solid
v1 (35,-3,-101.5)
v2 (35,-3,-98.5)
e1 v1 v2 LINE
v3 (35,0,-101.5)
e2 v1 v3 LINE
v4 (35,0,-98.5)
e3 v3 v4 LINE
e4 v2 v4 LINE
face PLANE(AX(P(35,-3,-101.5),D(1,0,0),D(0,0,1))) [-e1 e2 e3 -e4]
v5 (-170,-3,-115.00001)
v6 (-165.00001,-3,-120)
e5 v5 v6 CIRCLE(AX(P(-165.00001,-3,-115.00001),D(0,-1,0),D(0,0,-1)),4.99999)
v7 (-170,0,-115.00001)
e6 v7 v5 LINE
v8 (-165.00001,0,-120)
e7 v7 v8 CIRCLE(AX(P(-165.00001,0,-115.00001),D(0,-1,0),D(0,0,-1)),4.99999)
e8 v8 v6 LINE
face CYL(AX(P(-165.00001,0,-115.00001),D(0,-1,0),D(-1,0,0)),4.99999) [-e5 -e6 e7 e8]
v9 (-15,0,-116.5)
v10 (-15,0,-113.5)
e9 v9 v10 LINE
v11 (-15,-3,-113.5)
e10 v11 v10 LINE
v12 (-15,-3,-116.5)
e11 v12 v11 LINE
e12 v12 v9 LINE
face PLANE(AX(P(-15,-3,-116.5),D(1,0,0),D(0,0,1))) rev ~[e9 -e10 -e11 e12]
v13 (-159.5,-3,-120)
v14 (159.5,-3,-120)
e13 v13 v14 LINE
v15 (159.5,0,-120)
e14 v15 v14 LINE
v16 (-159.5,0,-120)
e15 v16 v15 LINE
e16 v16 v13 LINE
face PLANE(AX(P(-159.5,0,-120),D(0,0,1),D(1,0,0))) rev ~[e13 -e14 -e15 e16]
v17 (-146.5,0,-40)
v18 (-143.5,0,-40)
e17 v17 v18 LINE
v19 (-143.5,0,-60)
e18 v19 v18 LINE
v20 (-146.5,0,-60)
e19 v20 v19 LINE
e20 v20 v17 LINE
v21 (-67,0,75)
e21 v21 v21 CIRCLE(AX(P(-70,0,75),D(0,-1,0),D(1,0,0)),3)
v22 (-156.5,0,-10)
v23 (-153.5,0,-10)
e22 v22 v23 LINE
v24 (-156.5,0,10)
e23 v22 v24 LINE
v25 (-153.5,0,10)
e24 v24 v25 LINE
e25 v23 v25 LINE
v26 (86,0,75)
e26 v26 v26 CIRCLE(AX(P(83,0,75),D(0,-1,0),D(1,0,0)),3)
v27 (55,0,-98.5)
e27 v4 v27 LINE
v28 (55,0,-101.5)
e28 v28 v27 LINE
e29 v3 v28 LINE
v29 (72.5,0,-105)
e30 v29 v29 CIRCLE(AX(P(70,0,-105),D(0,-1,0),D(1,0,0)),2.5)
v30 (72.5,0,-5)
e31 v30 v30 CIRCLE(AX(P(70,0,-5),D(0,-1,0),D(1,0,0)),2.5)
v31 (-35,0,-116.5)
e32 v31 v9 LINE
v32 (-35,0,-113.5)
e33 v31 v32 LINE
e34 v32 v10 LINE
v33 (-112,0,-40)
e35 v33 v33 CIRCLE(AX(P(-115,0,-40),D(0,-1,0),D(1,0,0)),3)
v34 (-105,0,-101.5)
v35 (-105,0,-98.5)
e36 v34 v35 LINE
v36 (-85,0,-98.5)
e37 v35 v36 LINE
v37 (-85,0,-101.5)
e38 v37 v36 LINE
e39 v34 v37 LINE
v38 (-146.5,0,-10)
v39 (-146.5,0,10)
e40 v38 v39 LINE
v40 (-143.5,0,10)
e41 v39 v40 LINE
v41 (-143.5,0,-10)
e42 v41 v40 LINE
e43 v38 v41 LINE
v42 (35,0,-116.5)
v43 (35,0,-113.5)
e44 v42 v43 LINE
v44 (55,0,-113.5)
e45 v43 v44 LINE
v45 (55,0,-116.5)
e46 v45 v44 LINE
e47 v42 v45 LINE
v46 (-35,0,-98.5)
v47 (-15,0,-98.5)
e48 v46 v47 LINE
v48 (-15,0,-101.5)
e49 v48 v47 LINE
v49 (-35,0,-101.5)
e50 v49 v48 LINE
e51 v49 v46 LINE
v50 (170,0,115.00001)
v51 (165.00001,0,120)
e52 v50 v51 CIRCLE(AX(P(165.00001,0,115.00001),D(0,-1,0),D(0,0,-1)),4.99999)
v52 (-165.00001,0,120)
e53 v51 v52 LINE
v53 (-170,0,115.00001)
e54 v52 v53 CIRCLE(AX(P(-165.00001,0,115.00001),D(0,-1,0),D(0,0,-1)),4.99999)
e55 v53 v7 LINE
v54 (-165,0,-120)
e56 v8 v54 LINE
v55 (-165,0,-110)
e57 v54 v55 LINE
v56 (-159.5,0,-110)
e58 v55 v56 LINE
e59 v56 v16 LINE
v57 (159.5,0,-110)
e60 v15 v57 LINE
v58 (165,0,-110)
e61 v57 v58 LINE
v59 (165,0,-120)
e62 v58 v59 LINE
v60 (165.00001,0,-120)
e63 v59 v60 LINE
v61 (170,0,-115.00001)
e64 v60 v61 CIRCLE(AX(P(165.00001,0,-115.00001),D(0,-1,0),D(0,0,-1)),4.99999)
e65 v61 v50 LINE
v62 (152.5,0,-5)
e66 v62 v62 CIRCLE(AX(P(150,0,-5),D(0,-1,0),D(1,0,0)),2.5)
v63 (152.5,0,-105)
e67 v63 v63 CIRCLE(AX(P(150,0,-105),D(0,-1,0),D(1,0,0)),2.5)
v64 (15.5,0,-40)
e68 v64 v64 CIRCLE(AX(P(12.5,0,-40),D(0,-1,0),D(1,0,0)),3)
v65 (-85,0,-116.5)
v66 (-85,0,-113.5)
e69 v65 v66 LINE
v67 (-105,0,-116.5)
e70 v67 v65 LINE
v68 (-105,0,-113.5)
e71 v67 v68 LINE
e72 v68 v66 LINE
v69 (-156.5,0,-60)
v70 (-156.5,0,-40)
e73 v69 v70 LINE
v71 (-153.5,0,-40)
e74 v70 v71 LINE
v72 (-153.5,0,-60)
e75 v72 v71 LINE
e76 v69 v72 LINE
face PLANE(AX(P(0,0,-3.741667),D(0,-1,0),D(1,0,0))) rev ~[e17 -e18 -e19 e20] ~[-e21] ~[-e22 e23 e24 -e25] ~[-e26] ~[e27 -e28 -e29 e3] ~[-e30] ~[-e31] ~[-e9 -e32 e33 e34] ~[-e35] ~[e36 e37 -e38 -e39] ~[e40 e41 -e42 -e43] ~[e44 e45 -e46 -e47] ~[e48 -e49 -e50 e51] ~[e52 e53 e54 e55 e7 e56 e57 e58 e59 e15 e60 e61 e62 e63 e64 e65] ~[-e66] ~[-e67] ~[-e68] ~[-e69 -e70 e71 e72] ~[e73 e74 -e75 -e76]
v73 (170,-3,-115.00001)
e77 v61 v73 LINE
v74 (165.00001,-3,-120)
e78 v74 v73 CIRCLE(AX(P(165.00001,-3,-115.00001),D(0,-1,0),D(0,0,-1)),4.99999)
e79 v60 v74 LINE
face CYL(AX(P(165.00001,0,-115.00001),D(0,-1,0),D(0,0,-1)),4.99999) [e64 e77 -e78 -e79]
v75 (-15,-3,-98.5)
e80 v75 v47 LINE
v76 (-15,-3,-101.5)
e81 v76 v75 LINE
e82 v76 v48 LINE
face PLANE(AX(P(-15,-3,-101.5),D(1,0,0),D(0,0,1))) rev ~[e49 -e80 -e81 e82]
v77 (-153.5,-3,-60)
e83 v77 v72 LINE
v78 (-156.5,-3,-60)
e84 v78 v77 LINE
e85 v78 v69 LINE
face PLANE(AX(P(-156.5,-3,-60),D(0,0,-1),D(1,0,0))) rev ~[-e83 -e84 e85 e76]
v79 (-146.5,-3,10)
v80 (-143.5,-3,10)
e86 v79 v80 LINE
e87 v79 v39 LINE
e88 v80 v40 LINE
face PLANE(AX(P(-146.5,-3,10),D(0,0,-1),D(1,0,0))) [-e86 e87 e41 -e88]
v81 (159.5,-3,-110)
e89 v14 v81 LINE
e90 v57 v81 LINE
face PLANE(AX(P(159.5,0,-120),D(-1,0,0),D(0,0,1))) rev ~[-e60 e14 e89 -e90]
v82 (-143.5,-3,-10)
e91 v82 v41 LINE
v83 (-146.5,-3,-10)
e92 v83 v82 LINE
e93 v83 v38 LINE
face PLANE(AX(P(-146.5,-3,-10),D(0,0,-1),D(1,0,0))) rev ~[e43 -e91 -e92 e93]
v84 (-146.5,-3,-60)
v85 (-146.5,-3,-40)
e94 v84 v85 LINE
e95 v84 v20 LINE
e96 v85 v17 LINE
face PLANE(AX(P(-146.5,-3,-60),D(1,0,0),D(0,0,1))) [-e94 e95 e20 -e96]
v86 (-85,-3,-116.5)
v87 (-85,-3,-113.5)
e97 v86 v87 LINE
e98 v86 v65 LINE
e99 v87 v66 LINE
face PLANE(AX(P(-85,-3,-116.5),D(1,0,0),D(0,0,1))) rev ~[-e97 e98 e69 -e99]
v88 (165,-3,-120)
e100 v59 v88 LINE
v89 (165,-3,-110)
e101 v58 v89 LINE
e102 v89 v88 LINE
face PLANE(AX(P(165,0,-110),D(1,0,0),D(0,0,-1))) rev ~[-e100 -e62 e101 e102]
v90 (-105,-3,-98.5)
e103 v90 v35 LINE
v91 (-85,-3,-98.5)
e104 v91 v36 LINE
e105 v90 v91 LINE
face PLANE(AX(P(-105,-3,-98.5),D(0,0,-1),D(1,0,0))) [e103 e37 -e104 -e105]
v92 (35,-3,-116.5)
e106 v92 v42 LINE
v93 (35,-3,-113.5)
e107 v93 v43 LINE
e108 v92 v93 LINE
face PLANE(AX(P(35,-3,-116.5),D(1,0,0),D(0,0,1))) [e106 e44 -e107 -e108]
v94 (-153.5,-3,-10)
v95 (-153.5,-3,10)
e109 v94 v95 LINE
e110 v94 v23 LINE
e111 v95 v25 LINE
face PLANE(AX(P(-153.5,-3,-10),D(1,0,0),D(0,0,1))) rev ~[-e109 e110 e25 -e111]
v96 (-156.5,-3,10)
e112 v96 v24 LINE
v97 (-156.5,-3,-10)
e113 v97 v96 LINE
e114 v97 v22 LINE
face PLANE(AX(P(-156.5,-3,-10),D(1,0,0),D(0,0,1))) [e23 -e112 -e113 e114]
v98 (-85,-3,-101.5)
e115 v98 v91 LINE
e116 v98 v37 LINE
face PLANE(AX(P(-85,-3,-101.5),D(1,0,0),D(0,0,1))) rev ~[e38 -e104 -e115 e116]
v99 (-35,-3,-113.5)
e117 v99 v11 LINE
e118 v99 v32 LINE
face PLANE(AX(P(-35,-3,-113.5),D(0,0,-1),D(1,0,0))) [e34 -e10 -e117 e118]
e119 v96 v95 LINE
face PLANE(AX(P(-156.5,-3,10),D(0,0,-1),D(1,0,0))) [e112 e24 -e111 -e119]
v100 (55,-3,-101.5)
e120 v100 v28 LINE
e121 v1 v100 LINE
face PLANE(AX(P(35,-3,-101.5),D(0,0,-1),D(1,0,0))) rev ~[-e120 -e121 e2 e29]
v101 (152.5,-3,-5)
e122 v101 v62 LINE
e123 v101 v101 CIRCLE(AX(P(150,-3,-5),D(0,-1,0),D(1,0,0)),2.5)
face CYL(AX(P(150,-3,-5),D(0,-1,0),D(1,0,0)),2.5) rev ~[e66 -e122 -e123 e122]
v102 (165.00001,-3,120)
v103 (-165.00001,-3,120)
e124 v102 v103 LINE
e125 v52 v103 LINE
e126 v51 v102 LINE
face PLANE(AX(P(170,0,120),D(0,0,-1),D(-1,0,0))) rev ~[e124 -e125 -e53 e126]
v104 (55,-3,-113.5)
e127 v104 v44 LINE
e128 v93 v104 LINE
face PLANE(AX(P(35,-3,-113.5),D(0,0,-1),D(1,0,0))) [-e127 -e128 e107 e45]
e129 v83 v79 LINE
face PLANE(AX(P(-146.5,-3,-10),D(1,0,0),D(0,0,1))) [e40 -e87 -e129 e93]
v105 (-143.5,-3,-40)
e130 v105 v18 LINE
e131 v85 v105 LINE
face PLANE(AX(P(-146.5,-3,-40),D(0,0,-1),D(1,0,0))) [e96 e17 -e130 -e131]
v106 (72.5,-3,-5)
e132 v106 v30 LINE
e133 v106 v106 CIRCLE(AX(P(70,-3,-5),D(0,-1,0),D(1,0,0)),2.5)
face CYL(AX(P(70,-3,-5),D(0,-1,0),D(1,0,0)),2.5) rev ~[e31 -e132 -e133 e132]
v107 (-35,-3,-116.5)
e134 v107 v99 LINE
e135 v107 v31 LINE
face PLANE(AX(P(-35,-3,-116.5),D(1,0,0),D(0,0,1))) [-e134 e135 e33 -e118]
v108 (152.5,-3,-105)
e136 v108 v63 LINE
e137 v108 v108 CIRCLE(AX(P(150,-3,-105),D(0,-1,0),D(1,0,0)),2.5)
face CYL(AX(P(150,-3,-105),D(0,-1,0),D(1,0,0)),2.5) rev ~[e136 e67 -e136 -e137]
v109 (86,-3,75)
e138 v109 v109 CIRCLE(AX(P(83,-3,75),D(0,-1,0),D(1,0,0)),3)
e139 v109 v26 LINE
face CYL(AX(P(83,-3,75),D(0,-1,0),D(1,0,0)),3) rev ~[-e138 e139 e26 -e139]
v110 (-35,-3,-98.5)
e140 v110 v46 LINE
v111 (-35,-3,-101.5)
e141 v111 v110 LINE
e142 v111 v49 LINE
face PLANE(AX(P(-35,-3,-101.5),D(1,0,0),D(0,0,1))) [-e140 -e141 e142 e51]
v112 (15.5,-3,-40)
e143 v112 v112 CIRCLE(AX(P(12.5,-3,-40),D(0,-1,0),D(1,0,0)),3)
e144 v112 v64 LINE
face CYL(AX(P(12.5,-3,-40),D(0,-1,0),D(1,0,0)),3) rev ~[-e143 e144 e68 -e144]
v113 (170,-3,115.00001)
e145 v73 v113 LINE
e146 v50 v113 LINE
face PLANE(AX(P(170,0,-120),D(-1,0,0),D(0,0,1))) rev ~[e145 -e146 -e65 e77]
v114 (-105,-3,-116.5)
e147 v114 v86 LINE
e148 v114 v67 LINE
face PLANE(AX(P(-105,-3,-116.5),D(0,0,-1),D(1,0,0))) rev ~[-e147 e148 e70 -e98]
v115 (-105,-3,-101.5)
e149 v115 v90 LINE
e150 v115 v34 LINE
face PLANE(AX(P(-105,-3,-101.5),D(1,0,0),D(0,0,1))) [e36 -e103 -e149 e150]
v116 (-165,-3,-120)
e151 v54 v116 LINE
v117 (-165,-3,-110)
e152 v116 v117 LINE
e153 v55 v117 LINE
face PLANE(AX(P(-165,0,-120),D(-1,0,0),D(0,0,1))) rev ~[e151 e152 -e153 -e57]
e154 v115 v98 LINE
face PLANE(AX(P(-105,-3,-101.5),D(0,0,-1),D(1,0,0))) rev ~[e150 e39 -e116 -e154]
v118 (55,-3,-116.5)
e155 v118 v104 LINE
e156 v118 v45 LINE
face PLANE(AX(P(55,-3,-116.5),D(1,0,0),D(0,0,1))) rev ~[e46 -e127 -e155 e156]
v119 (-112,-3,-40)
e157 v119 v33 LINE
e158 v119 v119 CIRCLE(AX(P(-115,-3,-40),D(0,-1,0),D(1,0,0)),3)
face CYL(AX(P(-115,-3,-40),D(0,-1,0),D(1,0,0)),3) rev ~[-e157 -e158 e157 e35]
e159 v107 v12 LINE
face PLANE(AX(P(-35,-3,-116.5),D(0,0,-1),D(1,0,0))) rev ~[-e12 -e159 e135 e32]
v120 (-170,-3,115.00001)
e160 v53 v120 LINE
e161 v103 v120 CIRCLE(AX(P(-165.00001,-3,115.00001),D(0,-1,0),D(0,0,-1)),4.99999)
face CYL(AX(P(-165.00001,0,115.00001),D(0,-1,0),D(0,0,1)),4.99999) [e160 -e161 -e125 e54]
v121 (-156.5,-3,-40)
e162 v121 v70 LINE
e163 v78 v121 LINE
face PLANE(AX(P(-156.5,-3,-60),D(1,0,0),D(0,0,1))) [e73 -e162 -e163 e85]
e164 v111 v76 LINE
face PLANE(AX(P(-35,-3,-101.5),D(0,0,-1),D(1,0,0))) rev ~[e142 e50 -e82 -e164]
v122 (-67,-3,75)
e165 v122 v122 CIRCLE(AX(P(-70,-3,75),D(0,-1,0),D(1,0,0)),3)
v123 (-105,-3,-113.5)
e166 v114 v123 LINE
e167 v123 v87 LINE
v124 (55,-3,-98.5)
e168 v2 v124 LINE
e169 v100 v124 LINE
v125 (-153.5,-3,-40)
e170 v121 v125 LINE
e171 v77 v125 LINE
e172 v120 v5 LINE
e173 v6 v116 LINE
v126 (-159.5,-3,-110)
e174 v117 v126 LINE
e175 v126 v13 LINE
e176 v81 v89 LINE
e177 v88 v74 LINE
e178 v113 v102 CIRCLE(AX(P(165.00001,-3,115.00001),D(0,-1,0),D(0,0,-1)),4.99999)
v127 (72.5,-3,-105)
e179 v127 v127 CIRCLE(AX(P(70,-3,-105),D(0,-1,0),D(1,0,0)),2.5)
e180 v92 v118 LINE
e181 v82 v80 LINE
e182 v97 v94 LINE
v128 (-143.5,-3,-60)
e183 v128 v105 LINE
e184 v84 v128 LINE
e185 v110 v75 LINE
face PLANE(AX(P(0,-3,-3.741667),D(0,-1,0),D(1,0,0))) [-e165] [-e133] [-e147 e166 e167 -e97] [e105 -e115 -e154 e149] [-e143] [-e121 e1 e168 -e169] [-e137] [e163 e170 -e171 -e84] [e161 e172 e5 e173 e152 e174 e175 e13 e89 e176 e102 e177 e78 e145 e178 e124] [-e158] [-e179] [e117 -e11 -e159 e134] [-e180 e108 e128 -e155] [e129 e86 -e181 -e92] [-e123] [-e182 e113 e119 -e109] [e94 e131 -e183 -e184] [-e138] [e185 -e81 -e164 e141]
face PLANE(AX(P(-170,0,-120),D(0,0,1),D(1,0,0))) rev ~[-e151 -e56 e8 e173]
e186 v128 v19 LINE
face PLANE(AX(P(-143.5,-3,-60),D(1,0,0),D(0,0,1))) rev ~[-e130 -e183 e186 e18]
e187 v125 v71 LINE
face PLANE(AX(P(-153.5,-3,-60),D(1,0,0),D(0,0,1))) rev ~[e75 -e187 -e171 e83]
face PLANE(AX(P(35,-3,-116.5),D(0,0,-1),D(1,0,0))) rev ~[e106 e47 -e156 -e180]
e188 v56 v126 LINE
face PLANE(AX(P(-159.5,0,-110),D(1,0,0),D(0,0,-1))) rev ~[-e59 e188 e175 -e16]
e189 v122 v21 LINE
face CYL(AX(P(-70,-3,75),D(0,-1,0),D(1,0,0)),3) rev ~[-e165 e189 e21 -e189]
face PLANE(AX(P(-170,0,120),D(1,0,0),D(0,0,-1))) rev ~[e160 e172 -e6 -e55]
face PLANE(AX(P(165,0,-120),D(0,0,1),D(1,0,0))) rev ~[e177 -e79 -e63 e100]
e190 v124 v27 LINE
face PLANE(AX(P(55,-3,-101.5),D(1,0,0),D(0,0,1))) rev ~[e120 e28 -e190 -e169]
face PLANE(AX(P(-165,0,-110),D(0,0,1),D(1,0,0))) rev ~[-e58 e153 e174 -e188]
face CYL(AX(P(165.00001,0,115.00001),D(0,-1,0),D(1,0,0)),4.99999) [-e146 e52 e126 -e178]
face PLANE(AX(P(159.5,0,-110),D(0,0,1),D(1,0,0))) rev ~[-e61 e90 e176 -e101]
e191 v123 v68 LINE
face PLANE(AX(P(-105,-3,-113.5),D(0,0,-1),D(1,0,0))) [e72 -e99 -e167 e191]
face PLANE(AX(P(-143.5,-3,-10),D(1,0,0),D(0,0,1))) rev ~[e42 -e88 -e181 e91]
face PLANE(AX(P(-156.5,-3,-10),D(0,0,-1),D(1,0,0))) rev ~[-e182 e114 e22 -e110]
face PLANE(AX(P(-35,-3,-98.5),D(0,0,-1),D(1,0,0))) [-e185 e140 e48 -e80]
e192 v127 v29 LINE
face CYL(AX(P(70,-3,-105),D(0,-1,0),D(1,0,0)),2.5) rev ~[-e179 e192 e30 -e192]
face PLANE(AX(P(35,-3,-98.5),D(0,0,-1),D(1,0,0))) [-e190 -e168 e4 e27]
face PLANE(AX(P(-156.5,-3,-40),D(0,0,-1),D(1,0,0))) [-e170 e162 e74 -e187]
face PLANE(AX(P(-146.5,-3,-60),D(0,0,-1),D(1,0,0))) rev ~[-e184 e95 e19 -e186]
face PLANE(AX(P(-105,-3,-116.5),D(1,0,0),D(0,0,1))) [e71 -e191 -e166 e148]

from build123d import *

# Parameters (mm, degrees)
F1_DEPTH = 3
F2_R     = 3
F3_DEPTH = 3
F4_R     = 2.5
F5_DEPTH = 3
F6_W     = 20
F6_H     = 3
F6_W_2   = 3
F6_H_2   = 20
F7_DEPTH = 3
F8_R     = 4.99999


# Not quite as in the source:
# - a fillet or chamfer is up to 0.001 mm smaller than in the source, because OpenCascade refuses the exact size


with BuildPart() as f1:
    # F0 (on Front) → F1 (new body)
    with BuildSketch(Plane.XZ):
        Polygon((165, -120), (170, -120), (170, 120), (-170, 120), (-170, -120), (-165, -120), (-165, -110), (-159.5, -110), (-159.5, -120), (159.5, -120), (159.5, -110), (165, -110), align=None)
    extrude(amount=F1_DEPTH)

    # F2 (on face) → F3 (cut, through all)
    with BuildSketch(Plane.XZ.offset(3)):
        with Locations((-70, 75)):
            Circle(F2_R)
        with Locations((83, 75)):
            Circle(F2_R)
        with Locations((12.5, -40)):
            Circle(F2_R)
        with Locations((-115, -40)):
            Circle(F2_R)
    extrude(amount=-F3_DEPTH, mode=Mode.SUBTRACT)

    # F4 (on face) → F5 (cut, through all)
    with BuildSketch(Plane.XZ.offset(3)):
        with Locations((70, -5)):
            Circle(F4_R)
        with Locations((150, -5)):
            Circle(F4_R)
        with Locations((150, -105)):
            Circle(F4_R)
        with Locations((70, -105)):
            Circle(F4_R)
    extrude(amount=-F5_DEPTH, mode=Mode.SUBTRACT)

    # F6 (on face) → F7 (cut, through all)
    with BuildSketch(Plane.XZ.offset(3)):
        with Locations((-95, -100)):
            Rectangle(F6_W, F6_H)
        with Locations((-25, -100)):
            Rectangle(F6_W, F6_H)
        with Locations((45, -100)):
            Rectangle(F6_W, F6_H)
        with Locations((-95, -115)):
            Rectangle(F6_W, F6_H)
        with Locations((-25, -115)):
            Rectangle(F6_W, F6_H)
        with Locations((45, -115)):
            Rectangle(F6_W, F6_H)
        with Locations((-155, 0)):
            Rectangle(F6_W_2, F6_H_2)
        with Locations((-145, 0)):
            Rectangle(F6_W_2, F6_H_2)
        with Locations((-155, -50)):
            Rectangle(F6_W_2, F6_H_2)
        with Locations((-145, -50)):
            Rectangle(F6_W_2, F6_H_2)
    extrude(amount=-F7_DEPTH, mode=Mode.SUBTRACT)

    # F8 (radius 5 in the source; OpenCascade refuses exactly that, so slightly less here)
    f8_edges = [f1.edges().sort_by_distance(p)[0] for p in [
        (-170, -1.5, 120),
        (170, -1.5, 120),
        (170, -1.5, -120),
        (-170, -1.5, -120),
    ]]
    fillet(f8_edges, radius=F8_R)


solid = f1.part
